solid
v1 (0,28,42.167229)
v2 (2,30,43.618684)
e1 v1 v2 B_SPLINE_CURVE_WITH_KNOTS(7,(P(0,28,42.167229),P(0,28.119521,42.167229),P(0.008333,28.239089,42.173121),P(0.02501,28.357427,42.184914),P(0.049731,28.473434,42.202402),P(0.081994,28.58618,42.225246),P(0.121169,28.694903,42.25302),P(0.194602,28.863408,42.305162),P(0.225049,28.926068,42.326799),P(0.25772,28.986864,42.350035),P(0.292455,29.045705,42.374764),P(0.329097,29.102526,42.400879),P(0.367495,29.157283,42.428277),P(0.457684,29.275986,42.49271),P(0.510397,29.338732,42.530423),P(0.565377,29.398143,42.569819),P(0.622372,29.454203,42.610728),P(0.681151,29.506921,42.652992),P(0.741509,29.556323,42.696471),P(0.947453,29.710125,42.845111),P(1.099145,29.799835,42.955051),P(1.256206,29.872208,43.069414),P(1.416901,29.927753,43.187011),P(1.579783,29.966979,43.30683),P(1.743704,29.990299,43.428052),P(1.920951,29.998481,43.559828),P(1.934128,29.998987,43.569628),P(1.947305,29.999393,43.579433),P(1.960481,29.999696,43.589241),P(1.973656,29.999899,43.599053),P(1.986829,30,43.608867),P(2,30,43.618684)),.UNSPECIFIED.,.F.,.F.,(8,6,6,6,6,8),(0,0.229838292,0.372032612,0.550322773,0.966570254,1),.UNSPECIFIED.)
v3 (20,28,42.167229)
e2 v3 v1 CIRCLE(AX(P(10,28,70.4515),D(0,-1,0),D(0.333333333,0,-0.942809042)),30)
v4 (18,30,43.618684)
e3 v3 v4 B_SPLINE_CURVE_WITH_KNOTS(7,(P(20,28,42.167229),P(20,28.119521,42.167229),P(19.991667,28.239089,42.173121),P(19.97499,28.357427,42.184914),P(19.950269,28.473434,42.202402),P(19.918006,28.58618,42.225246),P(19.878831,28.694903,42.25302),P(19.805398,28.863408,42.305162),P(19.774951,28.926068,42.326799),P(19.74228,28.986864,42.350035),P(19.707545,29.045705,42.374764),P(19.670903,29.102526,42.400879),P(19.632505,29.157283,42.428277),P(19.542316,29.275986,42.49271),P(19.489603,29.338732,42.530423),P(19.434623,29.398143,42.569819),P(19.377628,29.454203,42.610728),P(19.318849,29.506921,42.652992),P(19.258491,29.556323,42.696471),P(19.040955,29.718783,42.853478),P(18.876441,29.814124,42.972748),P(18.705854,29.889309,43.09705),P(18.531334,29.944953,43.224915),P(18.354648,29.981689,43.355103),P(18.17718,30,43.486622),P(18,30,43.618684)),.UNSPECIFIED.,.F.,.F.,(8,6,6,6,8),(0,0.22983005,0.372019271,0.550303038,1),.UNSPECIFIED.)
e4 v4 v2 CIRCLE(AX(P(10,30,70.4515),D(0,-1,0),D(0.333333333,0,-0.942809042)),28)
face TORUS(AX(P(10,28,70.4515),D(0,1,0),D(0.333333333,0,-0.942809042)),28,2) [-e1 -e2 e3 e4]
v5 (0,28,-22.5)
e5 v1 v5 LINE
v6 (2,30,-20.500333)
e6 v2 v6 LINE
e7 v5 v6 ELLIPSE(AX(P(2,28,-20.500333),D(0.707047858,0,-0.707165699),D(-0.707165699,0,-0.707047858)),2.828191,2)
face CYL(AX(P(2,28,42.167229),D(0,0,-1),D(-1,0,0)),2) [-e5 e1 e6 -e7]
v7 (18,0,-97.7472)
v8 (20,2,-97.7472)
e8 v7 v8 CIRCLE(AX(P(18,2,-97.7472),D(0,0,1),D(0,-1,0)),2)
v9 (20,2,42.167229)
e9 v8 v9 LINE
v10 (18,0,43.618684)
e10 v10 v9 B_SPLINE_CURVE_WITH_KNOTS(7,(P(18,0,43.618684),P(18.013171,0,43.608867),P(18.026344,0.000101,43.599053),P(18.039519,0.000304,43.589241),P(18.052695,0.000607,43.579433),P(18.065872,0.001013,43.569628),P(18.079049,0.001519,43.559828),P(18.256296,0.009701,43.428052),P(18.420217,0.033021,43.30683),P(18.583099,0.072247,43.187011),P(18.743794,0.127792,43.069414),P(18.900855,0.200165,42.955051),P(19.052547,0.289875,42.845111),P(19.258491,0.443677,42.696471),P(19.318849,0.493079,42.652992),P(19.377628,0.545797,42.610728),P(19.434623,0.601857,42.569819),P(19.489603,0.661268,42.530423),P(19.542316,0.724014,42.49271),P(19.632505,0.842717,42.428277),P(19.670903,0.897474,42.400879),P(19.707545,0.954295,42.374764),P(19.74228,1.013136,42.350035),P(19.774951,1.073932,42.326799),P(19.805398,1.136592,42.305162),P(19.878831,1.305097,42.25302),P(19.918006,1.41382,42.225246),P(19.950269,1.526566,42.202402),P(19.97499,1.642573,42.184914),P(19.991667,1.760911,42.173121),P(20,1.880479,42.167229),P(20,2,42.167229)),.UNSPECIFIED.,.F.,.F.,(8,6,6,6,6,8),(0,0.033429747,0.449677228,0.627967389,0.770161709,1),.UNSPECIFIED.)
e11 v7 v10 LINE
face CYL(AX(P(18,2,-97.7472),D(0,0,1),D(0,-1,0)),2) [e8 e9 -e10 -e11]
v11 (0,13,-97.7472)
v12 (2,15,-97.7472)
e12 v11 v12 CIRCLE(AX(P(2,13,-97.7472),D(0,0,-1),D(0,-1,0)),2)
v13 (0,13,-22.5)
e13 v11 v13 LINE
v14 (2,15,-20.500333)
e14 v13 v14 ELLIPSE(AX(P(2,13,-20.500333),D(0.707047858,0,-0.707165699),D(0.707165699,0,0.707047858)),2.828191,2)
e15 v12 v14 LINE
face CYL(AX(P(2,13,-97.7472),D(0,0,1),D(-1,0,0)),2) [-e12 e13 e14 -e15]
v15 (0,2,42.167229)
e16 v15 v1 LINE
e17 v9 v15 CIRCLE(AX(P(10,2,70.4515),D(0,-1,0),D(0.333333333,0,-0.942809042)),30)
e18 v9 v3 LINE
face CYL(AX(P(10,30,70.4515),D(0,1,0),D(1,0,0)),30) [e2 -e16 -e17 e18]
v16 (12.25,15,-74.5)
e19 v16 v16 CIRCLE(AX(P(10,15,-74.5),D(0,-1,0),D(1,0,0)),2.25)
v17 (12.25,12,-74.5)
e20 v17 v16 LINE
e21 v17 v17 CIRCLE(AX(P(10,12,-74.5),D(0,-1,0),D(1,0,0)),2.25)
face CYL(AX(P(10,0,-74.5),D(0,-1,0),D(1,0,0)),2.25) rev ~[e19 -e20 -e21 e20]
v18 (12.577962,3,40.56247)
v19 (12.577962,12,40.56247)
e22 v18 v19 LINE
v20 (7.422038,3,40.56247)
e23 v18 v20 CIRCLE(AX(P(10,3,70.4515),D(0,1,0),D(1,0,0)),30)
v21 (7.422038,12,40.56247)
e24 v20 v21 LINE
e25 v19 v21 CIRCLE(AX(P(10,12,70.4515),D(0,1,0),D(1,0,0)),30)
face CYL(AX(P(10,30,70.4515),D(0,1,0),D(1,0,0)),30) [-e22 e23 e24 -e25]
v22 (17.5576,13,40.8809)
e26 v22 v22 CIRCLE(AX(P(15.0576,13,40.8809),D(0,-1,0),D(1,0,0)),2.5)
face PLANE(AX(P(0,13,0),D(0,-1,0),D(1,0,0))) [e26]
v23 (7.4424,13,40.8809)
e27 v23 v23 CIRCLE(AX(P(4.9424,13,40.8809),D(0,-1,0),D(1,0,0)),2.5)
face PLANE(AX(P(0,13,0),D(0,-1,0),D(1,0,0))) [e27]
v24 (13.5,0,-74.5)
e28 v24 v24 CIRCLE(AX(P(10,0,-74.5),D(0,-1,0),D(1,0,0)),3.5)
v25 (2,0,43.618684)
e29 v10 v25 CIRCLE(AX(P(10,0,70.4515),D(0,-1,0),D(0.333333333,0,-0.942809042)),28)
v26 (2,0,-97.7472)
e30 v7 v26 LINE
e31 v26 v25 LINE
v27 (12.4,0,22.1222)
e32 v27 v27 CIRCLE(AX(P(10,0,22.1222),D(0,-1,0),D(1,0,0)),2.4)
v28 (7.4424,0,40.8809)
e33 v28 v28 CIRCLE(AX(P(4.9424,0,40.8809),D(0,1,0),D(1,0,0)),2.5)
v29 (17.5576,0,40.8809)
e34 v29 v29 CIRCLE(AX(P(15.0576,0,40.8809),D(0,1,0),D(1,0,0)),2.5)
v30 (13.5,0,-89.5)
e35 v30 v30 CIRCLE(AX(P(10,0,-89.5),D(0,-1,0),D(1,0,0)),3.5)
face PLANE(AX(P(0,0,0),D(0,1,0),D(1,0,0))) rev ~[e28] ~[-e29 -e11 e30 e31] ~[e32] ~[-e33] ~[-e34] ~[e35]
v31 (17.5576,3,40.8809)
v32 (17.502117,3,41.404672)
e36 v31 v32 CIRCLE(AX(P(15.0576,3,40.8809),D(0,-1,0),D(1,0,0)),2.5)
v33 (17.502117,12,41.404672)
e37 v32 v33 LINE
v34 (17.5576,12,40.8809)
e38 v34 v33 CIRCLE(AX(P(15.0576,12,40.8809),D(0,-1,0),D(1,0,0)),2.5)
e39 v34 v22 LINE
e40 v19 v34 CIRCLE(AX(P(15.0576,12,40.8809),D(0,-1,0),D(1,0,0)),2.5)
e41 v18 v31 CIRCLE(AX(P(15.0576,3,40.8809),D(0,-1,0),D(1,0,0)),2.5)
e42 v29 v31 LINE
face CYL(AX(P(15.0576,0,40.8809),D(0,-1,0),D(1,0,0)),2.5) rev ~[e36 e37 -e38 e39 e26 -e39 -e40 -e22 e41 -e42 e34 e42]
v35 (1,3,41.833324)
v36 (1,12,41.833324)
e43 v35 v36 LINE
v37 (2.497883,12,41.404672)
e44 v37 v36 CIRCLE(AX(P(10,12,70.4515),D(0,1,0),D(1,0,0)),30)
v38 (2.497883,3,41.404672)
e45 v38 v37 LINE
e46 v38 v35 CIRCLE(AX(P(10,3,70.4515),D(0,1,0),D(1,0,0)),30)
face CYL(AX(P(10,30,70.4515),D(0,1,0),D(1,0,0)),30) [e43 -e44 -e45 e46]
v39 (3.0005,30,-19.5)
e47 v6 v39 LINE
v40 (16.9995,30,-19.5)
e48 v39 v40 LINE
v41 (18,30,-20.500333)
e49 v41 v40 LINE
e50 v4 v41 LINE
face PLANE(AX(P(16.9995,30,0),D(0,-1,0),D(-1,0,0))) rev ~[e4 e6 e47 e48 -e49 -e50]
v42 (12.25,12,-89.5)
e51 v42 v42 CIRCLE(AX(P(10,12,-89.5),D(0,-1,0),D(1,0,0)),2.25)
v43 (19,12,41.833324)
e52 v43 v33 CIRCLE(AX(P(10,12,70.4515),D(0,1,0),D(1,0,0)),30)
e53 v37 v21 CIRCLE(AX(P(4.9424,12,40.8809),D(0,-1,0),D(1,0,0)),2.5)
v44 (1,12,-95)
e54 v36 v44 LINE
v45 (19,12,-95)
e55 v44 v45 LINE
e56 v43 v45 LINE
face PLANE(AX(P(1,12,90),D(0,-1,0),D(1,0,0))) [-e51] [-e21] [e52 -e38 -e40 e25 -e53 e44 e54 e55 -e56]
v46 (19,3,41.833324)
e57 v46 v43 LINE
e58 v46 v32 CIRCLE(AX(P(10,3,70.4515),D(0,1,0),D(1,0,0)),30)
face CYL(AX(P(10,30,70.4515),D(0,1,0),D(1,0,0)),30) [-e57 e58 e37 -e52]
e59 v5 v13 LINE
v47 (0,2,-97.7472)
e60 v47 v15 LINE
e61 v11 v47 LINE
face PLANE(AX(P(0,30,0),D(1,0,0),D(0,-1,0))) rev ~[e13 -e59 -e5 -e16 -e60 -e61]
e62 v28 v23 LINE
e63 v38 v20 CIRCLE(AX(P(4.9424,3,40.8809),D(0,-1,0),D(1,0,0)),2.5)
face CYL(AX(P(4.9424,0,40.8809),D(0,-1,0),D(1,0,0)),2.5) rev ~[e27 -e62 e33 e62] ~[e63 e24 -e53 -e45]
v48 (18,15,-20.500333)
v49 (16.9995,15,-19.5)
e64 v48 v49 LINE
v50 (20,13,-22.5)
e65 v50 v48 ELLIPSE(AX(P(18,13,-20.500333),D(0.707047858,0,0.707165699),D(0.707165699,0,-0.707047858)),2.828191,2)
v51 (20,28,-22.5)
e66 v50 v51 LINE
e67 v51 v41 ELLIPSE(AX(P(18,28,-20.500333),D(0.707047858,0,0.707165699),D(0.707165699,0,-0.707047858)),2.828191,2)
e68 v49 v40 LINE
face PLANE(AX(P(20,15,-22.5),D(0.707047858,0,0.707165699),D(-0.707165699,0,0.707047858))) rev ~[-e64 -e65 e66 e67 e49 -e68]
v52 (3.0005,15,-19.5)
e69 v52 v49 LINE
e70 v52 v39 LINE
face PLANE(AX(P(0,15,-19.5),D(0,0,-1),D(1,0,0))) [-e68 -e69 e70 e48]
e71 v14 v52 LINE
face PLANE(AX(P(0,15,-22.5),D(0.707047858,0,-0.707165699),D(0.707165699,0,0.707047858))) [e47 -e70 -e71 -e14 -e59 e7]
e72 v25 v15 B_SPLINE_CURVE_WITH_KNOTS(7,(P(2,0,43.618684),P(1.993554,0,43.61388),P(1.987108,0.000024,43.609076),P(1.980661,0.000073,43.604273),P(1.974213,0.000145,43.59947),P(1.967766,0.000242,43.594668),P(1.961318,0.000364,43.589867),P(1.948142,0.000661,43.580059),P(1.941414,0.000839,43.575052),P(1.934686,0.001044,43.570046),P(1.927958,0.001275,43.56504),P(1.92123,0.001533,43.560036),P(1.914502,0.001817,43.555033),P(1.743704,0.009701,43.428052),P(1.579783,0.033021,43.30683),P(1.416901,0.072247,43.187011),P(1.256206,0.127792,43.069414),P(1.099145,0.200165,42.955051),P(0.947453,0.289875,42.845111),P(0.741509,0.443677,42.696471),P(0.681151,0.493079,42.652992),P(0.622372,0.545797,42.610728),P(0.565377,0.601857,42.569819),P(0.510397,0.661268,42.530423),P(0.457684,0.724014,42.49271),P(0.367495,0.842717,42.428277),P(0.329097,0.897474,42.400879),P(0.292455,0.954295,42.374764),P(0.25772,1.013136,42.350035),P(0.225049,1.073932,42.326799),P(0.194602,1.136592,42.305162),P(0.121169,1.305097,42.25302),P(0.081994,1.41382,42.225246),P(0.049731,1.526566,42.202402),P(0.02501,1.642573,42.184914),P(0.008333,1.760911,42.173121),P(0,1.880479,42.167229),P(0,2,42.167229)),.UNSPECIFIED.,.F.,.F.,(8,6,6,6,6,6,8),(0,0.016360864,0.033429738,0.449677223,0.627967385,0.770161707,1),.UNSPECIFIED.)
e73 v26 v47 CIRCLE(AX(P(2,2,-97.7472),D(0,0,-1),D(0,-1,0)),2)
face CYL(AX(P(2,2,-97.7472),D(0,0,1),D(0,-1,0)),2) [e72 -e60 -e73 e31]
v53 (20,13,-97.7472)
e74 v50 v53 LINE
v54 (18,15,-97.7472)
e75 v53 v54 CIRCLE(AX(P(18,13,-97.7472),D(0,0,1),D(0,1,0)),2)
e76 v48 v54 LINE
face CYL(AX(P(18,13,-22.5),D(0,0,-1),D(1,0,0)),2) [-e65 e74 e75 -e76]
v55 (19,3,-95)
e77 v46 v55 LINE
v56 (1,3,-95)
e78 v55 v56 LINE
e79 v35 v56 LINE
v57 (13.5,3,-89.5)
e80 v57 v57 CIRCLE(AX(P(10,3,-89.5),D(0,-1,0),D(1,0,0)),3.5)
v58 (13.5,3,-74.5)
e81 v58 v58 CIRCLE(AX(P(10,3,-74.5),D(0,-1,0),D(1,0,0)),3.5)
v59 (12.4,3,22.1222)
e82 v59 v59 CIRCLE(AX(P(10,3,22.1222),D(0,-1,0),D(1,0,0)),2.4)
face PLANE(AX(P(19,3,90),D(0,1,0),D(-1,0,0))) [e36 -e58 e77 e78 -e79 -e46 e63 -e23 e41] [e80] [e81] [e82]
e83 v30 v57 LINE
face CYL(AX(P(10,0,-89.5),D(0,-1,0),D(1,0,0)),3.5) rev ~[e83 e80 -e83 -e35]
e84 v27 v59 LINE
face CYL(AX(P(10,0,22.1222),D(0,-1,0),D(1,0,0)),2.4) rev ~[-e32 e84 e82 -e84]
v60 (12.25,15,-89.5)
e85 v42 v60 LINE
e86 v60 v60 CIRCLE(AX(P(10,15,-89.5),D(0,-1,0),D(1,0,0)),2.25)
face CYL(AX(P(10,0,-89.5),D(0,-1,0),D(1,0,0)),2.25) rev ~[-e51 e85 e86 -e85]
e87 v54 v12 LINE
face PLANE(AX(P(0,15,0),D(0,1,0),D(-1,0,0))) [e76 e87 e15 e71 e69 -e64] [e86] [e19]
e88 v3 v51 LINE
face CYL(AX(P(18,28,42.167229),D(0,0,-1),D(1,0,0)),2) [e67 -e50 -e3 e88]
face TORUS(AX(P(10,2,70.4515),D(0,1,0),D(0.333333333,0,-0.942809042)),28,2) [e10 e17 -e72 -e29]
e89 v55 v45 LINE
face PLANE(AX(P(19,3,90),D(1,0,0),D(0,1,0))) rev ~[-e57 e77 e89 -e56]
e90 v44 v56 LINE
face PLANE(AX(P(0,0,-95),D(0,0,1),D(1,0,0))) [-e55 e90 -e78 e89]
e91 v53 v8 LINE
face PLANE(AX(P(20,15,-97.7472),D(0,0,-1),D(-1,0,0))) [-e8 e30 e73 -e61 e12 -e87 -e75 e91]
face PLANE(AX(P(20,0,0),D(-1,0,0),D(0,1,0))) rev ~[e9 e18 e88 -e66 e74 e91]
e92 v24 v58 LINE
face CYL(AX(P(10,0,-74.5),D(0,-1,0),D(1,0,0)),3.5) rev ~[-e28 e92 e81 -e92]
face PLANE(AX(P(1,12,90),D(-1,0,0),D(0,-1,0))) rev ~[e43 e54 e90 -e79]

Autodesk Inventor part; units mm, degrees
ref_plane "YZ Plane" through (0, 0, 0) normal (1, 0, 0) x (0, 1, 0)
ref_plane "XZ Plane" through (0, 0, 0) normal (0, 1, 0) x (-1, 0, 0)
ref_plane "XY Plane" through (0, 0, 0) normal (0, 0, 1) x (1, 0, 0)
sketch "Sketch1" plane through (0, 0, 0) normal (0, 1, 0) x (-1, 0, 0)
  line L0 (0, 0) -> (-20, 0)
  line L1 (-20, 0) -> (-20, -100)
  line L2 (-20, -100) -> (0, -100)
  line L3 (0, -100) -> (0, 0)
  dimension "d0" = 20
  dimension "d1" = 100
extrude "Extrusion1" add sketch "Sketch1" along normal blind 15
sketch "Sketch2" plane through (0, 15, 0) normal (0, 1, 0) x (1, 0, 0)
  line L0 (20, 0) -> (20, 100) projected
  line L1 (0, 100) -> (0, 0) projected
  line L2 (20, 0) -> (0, 0)
  line L3 (0, 0) -> (0, 19.5)
  line L4 (0, 19.5) -> (20, 19.5)
  line L5 (20, 19.5) -> (20, 0)
  dimension "d4" = 19.5
extrude "Extrusion2" add sketch "Sketch2" along normal blind 15
sketch "Sketch3" plane through (0, 15, 0) normal (0, 1, 0) x (1, 0, 0)
  line L0 (20, 19.5) -> (0, 19.5) projected
  line L1 (0, 19.5) -> (0, 22.5)
  line L2 (0, 100) -> (0, 0) projected
  line L3 (0, 22.5) -> (3.0005, 19.5)
  line L4 (3.0005, 19.5) -> (0, 19.5)
  line L5 (20, 19.5) -> (20, 22.5)
  line L6 (20, 0) -> (20, 100) projected
  line L7 (20, 22.5) -> (16.9995, 19.5)
  line L8 (16.9995, 19.5) -> (20, 19.5)
  dimension "d7" = 3
  dimension "d8" = 4.243
  dimension "d9" = 3
  dimension "d10" = 4.243
extrude "Extrusion3" add sketch "Sketch3" along normal blind 15
sketch "Sketch4" plane through (0, 0, 0) normal (0, 0, 1) x (1, 0, 0)
  point P0 (0, 0)
sketch "Sketch5" plane through (0, 0, 0) normal (0, 0, 1) x (1, 0, 0)
  line L0 (0, 0) -> (20, 0) projected
  line L1 (20, 30) -> (16.9995, 30) projected
  line L2 (0, 0) -> (20, 0)
  line L3 (20, 0) -> (20, 30)
  line L4 (20, 30) -> (0, 30)
  line L5 (0, 30) -> (0, 0)
extrude "Extrusion4" add sketch "Sketch5" along normal blind 80
sketch "Sketch6" plane through (0, 0, 80) normal (0, 0, 1) x (1, 0, 0)
  line L0 (19, 3) -> (1, 3)
  line L1 (1, 3) -> (1, 12)
  line L2 (1, 12) -> (19, 12)
  line L3 (19, 12) -> (19, 3)
  line L4 (0, 30) -> (0, 0) projected
  line L5 (0, 0) -> (20, 0) projected
  dimension "d15" = 18
  dimension "d16" = 9
  dimension "d17" = 1
  dimension "d18" = 3
extrude "Extrusion5" cut sketch "Sketch6" against normal blind 160
sketch "Sketch7" plane through (0, 0, 0) normal (0, -1, 0) x (1, 0, 0)
  circle A0 centre (10, -89.5) radius 2.25
  circle A1 centre (10, -74.5) radius 2.25
  line L0 (20, -100) -> (0, -100) projected
  line L1 (0, -100) -> (0, 80) projected
  point P0 (0, 0)
  point P1 (10, -100)
  dimension "d21" = 4.5
  dimension "d22" = 4.5
  dimension "d23" = 10.5
  dimension "d24" = 10.5
  dimension "d25" = 10
  dimension "d26" = 10
extrude "Extrusion6" cut sketch "Sketch7" against normal blind 160
sketch "Sketch8" plane through (0, 0, -80) normal (0, 0, 1) x (1, 0, 0)
  line L0 (19, 3) -> (1, 3) projected
  line L1 (1, 12) -> (19, 12) projected
  line L2 (19, 3) -> (1, 3)
  line L3 (1, 3) -> (1, 12)
  line L4 (1, 12) -> (19, 12)
  line L5 (19, 12) -> (19, 3)
  point P0 (0, 0)
extrude "Extrusion7" add sketch "Sketch8" along normal blind 170
sketch "Sketch9" plane through (0, 30, 0) normal (0, 1, 0) x (1, 0, 0)
  point P0 (0, 0)
sketch "Sketch10" plane through (0, 0, 90) normal (0, 0, 1) x (1, 0, 0)
  line L0 (19, 3) -> (1, 3) projected
  line L1 (1, 12) -> (19, 12) projected
  line L2 (1, 3) -> (19, 3)
  line L3 (19, 3) -> (19, 12)
  line L4 (19, 12) -> (1, 12)
  line L5 (1, 12) -> (1, 3)
  point P0 (0, 0)
extrude "Extrusion8" cut sketch "Sketch10" against normal blind 185
sketch "Sketch11" plane through (0, 15, 0) normal (0, 1, 0) x (1, 0, 0)
  line L0 (0, 100) -> (0, -80) projected
  line L1 (20, -80) -> (20, 100) projected
  line L2 (0, 100) -> (20, 100)
  line L3 (20, 100) -> (20, 97.7472)
  line L4 (20, 97.7472) -> (0, 97.7472)
  line L5 (0, 97.7472) -> (0, 100)
  point P0 (0, 0)
  point P1 (0, 97.7472)
extrude "Extrusion9" cut sketch "Sketch11" against normal blind 185
sketch "Sketch12" plane through (0, 30, 0) normal (0, 1, 0) x (1, 0, 0)
  circle A0 centre (10, -70.4515) radius 30
  point P0 (0, 0)
  dimension "d35" = 60
extrude "Extrusion10" add sketch "Sketch12" along normal mid plane 60
sketch "Sketch13" plane through (10, 60, 70.4515) normal (0, 1, 0) x (1, 0, 0)
  circle A0 centre (0, 0) radius 30
  point P0 (-10, 70.4515)
extrude "Extrusion11" cut sketch "Sketch13" against normal blind 30
sketch "Sketch14" plane through (0, 30, 0) normal (0, 1, 0) x (1, 0, 0)
  point P0 (0, 0)
sketch "Sketch15" plane through (0, 0, 0) normal (0, -1, 0) x (1, 0, 0)
  arc A0 (1, 41.8333) -> (19, 41.8333) centre (10, 70.4515) ccw projected
  circle A1 centre (4.9424, 40.8809) radius 2.5
  circle A2 centre (15.0576, 40.8809) radius 2.5
  point P0 (0, 0)
  dimension "d40" = 5
  dimension "d41" = 5
extrude "Extrusion12" cut sketch "Sketch15" against normal blind 13
sketch "Sketch16" plane through (0, 0, 0) normal (0, -1, 0) x (1, 0, 0)
  circle A0 centre (10, -89.5) radius 2.25 projected
  circle A1 centre (10, -89.5) radius 3.5
  circle A2 centre (10, -74.5) radius 2.25 projected
  circle A3 centre (10, -74.5) radius 3.5
  point P0 (0, 0)
  dimension "d44" = 7
  dimension "d45" = 7
extrude "Extrusion13" cut sketch "Sketch16" against normal blind 6
fillet "Fillet1" radius 2 8 edges at (20, 30, 9.8336) (20, 15, -60.1236) (0, 15, -60.1236) (0, 30, 9.8336) (0, 0, -27.79) (20, 0, -27.79) (10, 30, 100.4515) (10, 0, 100.4515)
sketch "Sketch17" plane through (0, 0, 0) normal (0, -1, 0) x (1, 0, 0)
  circle A0 centre (10, 22.1222) radius 2.4
  line L0 (2, -97.7472) -> (2, 43.6187) projected
  point P0 (0, 0)
  dimension "d49" = 4.8
  dimension "d50" = 8
extrude "Extrusion14" cut sketch "Sketch17" against normal blind 6
properties part number "shotHolder"
